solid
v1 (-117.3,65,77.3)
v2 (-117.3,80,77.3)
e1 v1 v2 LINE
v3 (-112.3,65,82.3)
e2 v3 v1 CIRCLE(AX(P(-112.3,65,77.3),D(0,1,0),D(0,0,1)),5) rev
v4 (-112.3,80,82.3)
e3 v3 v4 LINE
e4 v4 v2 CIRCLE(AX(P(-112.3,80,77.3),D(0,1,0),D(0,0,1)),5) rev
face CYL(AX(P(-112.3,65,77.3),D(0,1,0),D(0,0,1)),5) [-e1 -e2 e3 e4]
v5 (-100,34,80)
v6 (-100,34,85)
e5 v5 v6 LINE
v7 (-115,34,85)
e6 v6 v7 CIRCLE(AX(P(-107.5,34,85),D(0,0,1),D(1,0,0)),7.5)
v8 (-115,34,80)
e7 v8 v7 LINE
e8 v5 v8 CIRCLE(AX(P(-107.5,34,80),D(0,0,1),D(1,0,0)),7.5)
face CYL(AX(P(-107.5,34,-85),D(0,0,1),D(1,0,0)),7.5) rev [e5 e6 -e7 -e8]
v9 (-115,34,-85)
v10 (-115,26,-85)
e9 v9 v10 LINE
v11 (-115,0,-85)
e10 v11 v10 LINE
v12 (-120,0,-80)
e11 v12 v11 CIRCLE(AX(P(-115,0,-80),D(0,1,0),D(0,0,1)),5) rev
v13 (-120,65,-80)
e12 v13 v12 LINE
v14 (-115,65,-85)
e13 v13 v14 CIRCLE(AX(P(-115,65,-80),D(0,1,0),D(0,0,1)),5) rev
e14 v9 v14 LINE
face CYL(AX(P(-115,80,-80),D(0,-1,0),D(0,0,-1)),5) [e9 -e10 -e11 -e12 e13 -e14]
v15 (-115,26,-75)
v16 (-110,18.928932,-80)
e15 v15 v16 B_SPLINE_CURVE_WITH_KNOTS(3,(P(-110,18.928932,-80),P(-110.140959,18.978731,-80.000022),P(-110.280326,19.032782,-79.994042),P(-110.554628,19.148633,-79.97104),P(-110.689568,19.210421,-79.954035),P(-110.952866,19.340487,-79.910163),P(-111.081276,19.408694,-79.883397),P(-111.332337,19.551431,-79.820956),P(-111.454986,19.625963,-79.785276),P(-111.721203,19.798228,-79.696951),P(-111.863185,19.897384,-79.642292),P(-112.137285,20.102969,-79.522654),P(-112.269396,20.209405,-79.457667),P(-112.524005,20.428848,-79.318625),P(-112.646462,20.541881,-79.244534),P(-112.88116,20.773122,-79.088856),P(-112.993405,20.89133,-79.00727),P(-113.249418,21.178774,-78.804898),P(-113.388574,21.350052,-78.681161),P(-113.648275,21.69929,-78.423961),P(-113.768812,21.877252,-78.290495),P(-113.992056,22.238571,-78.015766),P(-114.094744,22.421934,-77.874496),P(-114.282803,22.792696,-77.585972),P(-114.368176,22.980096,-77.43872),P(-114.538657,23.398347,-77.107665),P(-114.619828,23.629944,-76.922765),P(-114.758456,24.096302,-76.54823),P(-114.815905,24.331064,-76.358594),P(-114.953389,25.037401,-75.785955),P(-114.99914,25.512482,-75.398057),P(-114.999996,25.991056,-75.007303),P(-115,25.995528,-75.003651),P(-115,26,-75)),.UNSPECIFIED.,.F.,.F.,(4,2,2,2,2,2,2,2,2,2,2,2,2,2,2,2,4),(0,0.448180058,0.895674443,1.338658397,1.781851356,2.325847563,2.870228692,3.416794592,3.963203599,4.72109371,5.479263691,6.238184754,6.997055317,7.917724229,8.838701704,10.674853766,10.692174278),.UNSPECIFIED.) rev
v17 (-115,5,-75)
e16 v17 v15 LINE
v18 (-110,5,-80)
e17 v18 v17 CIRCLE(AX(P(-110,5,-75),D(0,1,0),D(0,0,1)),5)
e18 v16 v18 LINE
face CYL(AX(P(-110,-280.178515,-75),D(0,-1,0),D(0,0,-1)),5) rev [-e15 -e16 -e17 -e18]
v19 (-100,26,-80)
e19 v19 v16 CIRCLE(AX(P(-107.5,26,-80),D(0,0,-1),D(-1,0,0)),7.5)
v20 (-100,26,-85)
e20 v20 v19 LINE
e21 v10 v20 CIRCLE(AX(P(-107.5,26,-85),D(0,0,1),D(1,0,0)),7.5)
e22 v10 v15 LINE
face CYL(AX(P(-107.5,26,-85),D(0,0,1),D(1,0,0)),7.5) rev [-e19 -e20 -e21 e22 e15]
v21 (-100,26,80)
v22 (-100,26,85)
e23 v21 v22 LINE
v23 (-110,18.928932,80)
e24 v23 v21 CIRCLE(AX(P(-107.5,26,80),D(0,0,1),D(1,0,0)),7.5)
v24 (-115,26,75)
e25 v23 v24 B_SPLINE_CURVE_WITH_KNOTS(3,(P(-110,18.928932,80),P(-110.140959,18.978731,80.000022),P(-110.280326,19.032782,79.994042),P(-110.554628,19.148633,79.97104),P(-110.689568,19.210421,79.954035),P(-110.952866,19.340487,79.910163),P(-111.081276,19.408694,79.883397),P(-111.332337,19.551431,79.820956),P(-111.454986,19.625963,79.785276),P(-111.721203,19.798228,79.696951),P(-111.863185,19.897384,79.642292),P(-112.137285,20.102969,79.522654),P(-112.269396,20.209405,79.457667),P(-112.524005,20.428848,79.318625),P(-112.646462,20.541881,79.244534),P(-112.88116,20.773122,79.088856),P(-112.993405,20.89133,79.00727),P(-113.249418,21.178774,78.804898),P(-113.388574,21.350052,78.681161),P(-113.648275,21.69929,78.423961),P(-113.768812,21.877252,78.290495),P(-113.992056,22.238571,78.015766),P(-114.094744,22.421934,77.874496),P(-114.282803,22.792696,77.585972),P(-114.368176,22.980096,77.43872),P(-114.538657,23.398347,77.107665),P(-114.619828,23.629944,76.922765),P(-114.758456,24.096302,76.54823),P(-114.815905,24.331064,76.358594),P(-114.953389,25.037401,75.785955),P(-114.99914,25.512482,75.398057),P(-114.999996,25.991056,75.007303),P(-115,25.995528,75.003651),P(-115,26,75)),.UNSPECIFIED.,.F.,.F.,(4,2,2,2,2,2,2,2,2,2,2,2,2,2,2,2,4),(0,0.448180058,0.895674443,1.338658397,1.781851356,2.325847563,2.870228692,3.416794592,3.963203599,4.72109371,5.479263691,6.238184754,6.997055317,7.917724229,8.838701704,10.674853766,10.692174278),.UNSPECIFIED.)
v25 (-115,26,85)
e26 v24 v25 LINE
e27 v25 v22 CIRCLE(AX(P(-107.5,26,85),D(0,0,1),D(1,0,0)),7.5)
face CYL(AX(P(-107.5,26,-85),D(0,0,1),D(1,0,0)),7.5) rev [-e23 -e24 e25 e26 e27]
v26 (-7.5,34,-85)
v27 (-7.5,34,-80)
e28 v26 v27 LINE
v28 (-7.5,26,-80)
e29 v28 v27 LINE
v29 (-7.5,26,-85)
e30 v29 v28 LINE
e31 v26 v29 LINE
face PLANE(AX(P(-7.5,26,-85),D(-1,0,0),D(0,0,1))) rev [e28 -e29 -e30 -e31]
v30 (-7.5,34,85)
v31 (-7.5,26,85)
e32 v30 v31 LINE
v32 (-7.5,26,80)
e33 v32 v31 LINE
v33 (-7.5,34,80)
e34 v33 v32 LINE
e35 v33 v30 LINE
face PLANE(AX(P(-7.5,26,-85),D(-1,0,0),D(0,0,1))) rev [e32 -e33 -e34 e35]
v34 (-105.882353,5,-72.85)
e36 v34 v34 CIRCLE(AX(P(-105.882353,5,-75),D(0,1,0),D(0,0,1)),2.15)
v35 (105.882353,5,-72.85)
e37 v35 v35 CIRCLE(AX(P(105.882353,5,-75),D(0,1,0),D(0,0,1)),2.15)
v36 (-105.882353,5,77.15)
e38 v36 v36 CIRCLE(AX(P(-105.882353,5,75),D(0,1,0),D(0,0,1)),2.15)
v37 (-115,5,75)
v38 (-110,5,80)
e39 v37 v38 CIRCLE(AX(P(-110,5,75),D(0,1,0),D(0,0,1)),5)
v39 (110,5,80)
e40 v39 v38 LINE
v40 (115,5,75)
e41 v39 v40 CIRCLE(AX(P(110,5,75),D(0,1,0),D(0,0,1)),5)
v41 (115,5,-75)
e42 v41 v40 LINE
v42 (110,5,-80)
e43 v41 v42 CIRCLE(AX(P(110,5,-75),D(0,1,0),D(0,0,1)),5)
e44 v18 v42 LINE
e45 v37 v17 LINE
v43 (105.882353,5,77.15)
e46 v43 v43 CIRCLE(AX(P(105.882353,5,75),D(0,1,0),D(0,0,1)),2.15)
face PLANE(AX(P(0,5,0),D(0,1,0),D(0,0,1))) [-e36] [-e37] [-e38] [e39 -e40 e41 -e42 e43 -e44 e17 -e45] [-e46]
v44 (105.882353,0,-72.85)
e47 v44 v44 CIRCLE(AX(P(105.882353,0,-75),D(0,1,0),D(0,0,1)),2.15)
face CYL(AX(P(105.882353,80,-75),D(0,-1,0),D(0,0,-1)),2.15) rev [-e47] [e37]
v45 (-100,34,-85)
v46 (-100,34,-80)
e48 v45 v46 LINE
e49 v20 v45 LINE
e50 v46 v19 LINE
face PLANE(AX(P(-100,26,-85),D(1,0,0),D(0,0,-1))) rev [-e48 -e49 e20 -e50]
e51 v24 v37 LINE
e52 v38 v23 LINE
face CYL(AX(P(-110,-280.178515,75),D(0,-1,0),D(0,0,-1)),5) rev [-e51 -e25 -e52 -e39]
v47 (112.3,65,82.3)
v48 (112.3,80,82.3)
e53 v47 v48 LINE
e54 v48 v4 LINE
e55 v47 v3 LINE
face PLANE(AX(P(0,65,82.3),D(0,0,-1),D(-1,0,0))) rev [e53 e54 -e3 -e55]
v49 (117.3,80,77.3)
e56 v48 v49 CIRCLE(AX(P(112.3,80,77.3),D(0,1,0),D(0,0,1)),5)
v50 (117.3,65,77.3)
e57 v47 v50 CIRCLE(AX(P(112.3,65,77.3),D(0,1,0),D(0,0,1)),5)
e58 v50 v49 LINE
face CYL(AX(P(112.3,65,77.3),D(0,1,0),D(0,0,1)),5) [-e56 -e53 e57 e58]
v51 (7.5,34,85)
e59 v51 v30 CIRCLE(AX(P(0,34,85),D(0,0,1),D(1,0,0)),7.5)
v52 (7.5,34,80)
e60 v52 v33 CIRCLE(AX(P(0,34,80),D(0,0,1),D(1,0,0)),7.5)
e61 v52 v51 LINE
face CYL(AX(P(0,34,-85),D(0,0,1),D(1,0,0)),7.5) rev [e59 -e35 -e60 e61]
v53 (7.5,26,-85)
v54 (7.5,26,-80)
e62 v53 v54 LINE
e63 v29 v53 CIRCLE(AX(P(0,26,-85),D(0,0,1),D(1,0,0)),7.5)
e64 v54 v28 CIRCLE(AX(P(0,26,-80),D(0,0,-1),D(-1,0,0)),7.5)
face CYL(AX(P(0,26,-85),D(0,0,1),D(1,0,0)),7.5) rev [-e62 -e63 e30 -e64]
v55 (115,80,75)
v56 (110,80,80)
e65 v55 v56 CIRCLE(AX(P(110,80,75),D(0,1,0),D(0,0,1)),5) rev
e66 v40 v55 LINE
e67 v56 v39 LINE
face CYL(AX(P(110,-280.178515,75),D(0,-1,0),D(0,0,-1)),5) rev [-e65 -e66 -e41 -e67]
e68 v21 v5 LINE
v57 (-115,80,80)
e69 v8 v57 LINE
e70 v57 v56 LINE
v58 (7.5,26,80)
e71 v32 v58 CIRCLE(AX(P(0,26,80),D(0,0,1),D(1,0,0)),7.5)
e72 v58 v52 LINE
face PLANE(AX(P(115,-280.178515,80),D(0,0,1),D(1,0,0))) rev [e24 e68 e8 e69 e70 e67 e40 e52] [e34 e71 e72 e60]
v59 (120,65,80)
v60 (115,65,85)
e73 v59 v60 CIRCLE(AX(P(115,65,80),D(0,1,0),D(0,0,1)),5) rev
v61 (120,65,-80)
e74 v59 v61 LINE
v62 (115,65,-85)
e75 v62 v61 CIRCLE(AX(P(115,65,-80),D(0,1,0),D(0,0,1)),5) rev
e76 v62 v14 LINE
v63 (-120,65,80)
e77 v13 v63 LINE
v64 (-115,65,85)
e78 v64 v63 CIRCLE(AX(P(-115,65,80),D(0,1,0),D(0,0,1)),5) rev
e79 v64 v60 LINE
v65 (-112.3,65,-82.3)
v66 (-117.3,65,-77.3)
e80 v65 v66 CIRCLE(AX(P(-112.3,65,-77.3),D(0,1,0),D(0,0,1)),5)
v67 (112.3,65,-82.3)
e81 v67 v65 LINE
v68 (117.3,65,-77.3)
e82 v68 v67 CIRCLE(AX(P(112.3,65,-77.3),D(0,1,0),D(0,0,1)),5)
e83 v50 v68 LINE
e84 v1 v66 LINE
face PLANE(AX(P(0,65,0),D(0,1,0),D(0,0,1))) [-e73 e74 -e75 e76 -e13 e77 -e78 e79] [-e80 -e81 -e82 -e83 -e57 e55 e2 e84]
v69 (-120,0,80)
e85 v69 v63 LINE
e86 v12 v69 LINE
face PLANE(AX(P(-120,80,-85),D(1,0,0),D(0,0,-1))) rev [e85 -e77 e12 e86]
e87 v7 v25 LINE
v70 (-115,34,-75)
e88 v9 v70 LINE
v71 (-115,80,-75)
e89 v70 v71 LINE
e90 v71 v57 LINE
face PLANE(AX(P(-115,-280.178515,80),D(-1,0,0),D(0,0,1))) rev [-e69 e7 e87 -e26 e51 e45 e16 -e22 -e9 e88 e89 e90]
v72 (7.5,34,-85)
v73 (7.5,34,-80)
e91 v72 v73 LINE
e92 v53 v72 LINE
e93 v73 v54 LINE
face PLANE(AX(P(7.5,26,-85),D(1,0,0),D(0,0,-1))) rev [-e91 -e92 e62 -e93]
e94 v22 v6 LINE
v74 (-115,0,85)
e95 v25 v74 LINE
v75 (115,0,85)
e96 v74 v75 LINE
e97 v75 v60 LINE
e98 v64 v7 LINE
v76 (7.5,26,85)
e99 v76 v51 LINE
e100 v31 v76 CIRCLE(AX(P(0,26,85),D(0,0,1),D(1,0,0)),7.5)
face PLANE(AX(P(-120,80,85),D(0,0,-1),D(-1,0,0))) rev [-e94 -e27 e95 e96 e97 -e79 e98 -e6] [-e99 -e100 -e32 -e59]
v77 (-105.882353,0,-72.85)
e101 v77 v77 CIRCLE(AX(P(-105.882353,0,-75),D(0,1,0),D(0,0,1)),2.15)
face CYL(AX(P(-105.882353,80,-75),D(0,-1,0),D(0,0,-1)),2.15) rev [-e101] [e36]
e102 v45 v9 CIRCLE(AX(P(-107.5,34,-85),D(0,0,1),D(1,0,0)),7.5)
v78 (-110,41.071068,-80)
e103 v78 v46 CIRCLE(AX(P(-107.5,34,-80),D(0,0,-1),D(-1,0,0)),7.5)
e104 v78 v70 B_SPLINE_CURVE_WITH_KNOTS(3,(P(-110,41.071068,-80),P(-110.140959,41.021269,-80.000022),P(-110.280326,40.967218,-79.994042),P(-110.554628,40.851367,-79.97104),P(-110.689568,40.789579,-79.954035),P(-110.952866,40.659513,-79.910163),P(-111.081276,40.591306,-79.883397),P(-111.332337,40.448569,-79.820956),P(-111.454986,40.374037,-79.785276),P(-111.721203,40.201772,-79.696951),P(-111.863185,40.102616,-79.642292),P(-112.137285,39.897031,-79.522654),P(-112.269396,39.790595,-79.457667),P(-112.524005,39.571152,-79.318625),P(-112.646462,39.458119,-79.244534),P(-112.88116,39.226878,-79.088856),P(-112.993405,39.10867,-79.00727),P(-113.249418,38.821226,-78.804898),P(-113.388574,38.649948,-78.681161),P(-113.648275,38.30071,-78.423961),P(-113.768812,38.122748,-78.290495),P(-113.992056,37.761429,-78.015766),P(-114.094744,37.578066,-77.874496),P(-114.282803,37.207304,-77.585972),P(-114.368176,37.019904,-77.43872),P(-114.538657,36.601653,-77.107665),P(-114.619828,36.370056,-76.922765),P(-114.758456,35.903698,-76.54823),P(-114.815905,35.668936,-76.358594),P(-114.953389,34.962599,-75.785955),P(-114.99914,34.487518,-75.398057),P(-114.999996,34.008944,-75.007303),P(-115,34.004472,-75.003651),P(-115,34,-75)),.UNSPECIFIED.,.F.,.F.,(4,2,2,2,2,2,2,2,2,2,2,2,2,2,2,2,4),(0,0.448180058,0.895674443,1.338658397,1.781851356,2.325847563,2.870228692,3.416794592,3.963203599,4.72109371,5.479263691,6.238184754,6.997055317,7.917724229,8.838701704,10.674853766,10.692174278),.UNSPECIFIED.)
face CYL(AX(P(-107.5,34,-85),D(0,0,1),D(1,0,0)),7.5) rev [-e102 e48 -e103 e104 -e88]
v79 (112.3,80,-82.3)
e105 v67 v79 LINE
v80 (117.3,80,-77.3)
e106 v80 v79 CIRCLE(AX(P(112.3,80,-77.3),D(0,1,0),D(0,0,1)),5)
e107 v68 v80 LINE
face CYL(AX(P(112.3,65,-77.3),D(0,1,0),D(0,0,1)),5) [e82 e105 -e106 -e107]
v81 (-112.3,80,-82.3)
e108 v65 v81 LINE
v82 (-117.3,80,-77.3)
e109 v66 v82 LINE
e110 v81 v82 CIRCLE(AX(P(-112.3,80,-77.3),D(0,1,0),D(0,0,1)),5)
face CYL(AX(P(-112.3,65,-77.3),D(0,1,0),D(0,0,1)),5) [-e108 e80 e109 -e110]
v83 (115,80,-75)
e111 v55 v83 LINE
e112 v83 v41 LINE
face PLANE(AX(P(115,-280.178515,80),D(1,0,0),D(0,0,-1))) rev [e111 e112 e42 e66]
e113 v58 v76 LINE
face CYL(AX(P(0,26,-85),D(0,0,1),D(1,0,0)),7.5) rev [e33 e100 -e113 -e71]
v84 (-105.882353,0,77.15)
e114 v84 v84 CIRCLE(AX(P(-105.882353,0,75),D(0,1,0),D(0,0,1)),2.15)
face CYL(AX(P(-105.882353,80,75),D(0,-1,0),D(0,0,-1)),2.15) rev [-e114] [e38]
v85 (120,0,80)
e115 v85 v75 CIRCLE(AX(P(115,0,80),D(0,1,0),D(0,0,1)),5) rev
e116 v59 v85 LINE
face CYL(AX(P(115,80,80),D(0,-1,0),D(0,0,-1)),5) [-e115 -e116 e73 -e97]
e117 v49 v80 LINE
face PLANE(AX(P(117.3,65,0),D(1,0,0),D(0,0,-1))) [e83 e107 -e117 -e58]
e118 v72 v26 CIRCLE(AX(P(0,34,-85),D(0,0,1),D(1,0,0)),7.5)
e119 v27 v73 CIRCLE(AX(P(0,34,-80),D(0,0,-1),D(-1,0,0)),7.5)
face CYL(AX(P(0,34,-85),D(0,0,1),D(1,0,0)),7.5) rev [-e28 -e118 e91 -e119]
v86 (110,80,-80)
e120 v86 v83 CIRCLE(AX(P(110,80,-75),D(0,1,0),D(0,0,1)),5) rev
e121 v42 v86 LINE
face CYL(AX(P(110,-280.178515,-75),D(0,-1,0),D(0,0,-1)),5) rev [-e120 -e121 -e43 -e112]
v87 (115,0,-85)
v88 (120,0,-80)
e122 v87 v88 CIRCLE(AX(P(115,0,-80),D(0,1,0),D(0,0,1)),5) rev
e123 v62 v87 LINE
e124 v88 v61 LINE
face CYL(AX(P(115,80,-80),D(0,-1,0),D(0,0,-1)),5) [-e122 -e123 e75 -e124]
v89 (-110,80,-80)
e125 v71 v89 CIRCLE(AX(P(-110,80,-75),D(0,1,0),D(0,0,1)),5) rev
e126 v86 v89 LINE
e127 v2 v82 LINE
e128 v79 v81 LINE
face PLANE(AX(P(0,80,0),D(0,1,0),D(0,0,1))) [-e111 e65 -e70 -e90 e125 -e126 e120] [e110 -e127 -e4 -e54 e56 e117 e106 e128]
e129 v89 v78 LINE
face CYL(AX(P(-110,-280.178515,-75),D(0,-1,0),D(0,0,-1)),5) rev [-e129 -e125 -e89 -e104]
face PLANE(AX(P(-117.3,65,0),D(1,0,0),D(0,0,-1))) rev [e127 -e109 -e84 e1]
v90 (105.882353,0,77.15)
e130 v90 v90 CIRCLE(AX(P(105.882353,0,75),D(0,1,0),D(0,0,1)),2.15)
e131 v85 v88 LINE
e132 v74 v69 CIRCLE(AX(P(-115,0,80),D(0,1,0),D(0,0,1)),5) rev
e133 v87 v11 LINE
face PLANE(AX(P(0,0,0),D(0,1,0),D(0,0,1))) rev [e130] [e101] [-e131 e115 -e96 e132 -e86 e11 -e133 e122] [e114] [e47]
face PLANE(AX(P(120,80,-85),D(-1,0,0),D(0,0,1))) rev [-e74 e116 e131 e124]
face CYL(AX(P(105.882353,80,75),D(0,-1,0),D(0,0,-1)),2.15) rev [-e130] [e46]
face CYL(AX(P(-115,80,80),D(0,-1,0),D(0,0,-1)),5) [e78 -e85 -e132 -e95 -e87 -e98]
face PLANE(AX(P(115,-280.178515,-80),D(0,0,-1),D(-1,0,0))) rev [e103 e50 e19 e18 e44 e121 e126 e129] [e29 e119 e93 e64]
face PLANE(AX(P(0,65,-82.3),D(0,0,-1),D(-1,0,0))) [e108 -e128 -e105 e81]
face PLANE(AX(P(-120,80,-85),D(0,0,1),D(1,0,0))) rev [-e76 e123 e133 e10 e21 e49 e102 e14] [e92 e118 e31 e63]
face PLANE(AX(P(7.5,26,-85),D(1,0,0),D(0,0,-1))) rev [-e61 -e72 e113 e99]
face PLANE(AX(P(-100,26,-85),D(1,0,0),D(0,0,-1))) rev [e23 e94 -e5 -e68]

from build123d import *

# Parameters (mm, degrees)
SKETCH_1_W               = 240
SKETCH_1_H               = 170
SKETCH_1_R               = 2.15
EXTRUDE_1_DEPTH          = 80
SKETCH_2_W               = 230
SKETCH_2_H               = 160
CUT_EXTRUDE_1_DEPTH      = 75
CUT_EXTRUDE_3_DEPTH      = 220.146070008
CUT_EXTRUDE_3_DEPTH_BACK = 220.146070008
FILLET_1_R               = 5
SKETCH_12_W              = 244.6
SKETCH_12_H              = 174.6
CUT_EXTRUDE_5_DEPTH      = 15


with BuildPart() as part:
    # 草图1 → 凸台-拉伸1 (new body)
    with BuildSketch(Plane(origin=(0, 0, 0), x_dir=(1, 0, 0), z_dir=(0, 1, 0))):
        Rectangle(SKETCH_1_W, SKETCH_1_H)
        with Locations(Location((-105.882352941, 75, 0), (0, 0, 270))):
            Circle(SKETCH_1_R, mode=Mode.SUBTRACT)
        with Locations(Location((105.882352941, 75, 0), (0, 0, 270))):
            Circle(SKETCH_1_R, mode=Mode.SUBTRACT)
        with Locations(Location((105.882352941, -75, 0), (0, 0, 270))):
            Circle(SKETCH_1_R, mode=Mode.SUBTRACT)
        with Locations(Location((-105.882352941, -75, 0), (0, 0, 270))):
            Circle(SKETCH_1_R, mode=Mode.SUBTRACT)
    extrude(amount=EXTRUDE_1_DEPTH)

    # 草图2 → 切除-拉伸1 (cut)
    with BuildSketch(Plane(origin=(0, 80, 0), x_dir=(1, 0, 0), z_dir=(0, 1, 0))):
        Rectangle(SKETCH_2_W, SKETCH_2_H)
    extrude(amount=-CUT_EXTRUDE_1_DEPTH, mode=Mode.SUBTRACT)

    # 草图9 → 切除-拉伸3 (cut, two sides: drawn at the far end of the back side and taken through both)
    with BuildSketch(Plane.XY.offset(-80).offset(-CUT_EXTRUDE_3_DEPTH_BACK)):
        with BuildLine():
            Line((-115, 26), (-115, 34))
            ThreePointArc((-115, 34), (-107.5, 41.5), (-100, 34))
            Line((-100, 34), (-100, 26))
            ThreePointArc((-100, 26), (-107.5, 18.5), (-115, 26))
        make_face()
        with BuildLine():
            Line((-7.5, 26), (-7.5, 34))
            ThreePointArc((-7.5, 34), (0, 41.5), (7.5, 34))
            Line((7.5, 34), (7.5, 26))
            ThreePointArc((7.5, 26), (0, 18.5), (-7.5, 26))
        make_face()
    extrude(amount=CUT_EXTRUDE_3_DEPTH + CUT_EXTRUDE_3_DEPTH_BACK, mode=Mode.SUBTRACT)

    # 圆角1
    fillet_1_edges = [part.edges().sort_by_distance(p)[0] for p in [
        (-115, 15.5, 80),
        (-115, 15.5, -80),
        (115, 42.5, -80),
        (115, 42.5, 80),
        (-115, 57, -80),
        (120, 40, 85),
        (-120, 40, 85),
        (-120, 40, -85),
        (120, 40, -85),
    ]]
    fillet(fillet_1_edges, radius=FILLET_1_R - 0.0001)  # a hair under: the kernel refuses the full size

    # 草图12 → 切除-拉伸5 (cut)
    # profile 1 of 2: a face of its own
    with BuildSketch(Plane(origin=(0, 80, 0), x_dir=(1, 0, 0), z_dir=(0, 1, 0))):
        Rectangle(SKETCH_12_W, SKETCH_12_H)
        with BuildLine():
            Line((115, 85), (-115, 85))
            ThreePointArc((-115, 85), (-118.535533906, 83.535533906), (-120, 80))
            Line((-120, 80), (-120, -80))
            ThreePointArc((-120, -80), (-118.535533906, -83.535533906), (-115, -85))
            Line((-115, -85), (115, -85))
            ThreePointArc((115, -85), (118.535533906, -83.535533906), (120, -80))
            Line((120, -80), (120, 80))
            ThreePointArc((120, 80), (118.535533906, 83.535533906), (115, 85))
        make_face(mode=Mode.SUBTRACT)
    # profile 2 of 2: a face of its own
    with BuildSketch(Plane(origin=(0, 80, 0), x_dir=(1, 0, 0), z_dir=(0, 1, 0))):
        with BuildLine():
            ThreePointArc((120, 80), (118.535533906, 83.535533906), (115, 85))
            Line((115, 85), (-115, 85))
            ThreePointArc((-115, 85), (-118.535533906, 83.535533906), (-120, 80))
            Line((-120, 80), (-120, -80))
            ThreePointArc((-120, -80), (-118.535533906, -83.535533906), (-115, -85))
            Line((-115, -85), (115, -85))
            ThreePointArc((115, -85), (118.535533906, -83.535533906), (120, -80))
            Line((120, -80), (120, 80))
        make_face()
        with BuildLine():
            ThreePointArc((-112.3, 82.3), (-115.835533906, 80.835533906), (-117.3, 77.3))
            Line((-117.3, 77.3), (-117.3, -77.3))
            ThreePointArc((-117.3, -77.3), (-115.835533906, -80.835533906), (-112.3, -82.3))
            Line((-112.3, -82.3), (112.3, -82.3))
            ThreePointArc((112.3, -82.3), (115.835533906, -80.835533906), (117.3, -77.3))
            Line((117.3, -77.3), (117.3, 77.3))
            ThreePointArc((117.3, 77.3), (115.835533906, 80.835533906), (112.3, 82.3))
            Line((112.3, 82.3), (-112.3, 82.3))
        make_face(mode=Mode.SUBTRACT)
    extrude(amount=-CUT_EXTRUDE_5_DEPTH, mode=Mode.SUBTRACT)


solid = part.part
